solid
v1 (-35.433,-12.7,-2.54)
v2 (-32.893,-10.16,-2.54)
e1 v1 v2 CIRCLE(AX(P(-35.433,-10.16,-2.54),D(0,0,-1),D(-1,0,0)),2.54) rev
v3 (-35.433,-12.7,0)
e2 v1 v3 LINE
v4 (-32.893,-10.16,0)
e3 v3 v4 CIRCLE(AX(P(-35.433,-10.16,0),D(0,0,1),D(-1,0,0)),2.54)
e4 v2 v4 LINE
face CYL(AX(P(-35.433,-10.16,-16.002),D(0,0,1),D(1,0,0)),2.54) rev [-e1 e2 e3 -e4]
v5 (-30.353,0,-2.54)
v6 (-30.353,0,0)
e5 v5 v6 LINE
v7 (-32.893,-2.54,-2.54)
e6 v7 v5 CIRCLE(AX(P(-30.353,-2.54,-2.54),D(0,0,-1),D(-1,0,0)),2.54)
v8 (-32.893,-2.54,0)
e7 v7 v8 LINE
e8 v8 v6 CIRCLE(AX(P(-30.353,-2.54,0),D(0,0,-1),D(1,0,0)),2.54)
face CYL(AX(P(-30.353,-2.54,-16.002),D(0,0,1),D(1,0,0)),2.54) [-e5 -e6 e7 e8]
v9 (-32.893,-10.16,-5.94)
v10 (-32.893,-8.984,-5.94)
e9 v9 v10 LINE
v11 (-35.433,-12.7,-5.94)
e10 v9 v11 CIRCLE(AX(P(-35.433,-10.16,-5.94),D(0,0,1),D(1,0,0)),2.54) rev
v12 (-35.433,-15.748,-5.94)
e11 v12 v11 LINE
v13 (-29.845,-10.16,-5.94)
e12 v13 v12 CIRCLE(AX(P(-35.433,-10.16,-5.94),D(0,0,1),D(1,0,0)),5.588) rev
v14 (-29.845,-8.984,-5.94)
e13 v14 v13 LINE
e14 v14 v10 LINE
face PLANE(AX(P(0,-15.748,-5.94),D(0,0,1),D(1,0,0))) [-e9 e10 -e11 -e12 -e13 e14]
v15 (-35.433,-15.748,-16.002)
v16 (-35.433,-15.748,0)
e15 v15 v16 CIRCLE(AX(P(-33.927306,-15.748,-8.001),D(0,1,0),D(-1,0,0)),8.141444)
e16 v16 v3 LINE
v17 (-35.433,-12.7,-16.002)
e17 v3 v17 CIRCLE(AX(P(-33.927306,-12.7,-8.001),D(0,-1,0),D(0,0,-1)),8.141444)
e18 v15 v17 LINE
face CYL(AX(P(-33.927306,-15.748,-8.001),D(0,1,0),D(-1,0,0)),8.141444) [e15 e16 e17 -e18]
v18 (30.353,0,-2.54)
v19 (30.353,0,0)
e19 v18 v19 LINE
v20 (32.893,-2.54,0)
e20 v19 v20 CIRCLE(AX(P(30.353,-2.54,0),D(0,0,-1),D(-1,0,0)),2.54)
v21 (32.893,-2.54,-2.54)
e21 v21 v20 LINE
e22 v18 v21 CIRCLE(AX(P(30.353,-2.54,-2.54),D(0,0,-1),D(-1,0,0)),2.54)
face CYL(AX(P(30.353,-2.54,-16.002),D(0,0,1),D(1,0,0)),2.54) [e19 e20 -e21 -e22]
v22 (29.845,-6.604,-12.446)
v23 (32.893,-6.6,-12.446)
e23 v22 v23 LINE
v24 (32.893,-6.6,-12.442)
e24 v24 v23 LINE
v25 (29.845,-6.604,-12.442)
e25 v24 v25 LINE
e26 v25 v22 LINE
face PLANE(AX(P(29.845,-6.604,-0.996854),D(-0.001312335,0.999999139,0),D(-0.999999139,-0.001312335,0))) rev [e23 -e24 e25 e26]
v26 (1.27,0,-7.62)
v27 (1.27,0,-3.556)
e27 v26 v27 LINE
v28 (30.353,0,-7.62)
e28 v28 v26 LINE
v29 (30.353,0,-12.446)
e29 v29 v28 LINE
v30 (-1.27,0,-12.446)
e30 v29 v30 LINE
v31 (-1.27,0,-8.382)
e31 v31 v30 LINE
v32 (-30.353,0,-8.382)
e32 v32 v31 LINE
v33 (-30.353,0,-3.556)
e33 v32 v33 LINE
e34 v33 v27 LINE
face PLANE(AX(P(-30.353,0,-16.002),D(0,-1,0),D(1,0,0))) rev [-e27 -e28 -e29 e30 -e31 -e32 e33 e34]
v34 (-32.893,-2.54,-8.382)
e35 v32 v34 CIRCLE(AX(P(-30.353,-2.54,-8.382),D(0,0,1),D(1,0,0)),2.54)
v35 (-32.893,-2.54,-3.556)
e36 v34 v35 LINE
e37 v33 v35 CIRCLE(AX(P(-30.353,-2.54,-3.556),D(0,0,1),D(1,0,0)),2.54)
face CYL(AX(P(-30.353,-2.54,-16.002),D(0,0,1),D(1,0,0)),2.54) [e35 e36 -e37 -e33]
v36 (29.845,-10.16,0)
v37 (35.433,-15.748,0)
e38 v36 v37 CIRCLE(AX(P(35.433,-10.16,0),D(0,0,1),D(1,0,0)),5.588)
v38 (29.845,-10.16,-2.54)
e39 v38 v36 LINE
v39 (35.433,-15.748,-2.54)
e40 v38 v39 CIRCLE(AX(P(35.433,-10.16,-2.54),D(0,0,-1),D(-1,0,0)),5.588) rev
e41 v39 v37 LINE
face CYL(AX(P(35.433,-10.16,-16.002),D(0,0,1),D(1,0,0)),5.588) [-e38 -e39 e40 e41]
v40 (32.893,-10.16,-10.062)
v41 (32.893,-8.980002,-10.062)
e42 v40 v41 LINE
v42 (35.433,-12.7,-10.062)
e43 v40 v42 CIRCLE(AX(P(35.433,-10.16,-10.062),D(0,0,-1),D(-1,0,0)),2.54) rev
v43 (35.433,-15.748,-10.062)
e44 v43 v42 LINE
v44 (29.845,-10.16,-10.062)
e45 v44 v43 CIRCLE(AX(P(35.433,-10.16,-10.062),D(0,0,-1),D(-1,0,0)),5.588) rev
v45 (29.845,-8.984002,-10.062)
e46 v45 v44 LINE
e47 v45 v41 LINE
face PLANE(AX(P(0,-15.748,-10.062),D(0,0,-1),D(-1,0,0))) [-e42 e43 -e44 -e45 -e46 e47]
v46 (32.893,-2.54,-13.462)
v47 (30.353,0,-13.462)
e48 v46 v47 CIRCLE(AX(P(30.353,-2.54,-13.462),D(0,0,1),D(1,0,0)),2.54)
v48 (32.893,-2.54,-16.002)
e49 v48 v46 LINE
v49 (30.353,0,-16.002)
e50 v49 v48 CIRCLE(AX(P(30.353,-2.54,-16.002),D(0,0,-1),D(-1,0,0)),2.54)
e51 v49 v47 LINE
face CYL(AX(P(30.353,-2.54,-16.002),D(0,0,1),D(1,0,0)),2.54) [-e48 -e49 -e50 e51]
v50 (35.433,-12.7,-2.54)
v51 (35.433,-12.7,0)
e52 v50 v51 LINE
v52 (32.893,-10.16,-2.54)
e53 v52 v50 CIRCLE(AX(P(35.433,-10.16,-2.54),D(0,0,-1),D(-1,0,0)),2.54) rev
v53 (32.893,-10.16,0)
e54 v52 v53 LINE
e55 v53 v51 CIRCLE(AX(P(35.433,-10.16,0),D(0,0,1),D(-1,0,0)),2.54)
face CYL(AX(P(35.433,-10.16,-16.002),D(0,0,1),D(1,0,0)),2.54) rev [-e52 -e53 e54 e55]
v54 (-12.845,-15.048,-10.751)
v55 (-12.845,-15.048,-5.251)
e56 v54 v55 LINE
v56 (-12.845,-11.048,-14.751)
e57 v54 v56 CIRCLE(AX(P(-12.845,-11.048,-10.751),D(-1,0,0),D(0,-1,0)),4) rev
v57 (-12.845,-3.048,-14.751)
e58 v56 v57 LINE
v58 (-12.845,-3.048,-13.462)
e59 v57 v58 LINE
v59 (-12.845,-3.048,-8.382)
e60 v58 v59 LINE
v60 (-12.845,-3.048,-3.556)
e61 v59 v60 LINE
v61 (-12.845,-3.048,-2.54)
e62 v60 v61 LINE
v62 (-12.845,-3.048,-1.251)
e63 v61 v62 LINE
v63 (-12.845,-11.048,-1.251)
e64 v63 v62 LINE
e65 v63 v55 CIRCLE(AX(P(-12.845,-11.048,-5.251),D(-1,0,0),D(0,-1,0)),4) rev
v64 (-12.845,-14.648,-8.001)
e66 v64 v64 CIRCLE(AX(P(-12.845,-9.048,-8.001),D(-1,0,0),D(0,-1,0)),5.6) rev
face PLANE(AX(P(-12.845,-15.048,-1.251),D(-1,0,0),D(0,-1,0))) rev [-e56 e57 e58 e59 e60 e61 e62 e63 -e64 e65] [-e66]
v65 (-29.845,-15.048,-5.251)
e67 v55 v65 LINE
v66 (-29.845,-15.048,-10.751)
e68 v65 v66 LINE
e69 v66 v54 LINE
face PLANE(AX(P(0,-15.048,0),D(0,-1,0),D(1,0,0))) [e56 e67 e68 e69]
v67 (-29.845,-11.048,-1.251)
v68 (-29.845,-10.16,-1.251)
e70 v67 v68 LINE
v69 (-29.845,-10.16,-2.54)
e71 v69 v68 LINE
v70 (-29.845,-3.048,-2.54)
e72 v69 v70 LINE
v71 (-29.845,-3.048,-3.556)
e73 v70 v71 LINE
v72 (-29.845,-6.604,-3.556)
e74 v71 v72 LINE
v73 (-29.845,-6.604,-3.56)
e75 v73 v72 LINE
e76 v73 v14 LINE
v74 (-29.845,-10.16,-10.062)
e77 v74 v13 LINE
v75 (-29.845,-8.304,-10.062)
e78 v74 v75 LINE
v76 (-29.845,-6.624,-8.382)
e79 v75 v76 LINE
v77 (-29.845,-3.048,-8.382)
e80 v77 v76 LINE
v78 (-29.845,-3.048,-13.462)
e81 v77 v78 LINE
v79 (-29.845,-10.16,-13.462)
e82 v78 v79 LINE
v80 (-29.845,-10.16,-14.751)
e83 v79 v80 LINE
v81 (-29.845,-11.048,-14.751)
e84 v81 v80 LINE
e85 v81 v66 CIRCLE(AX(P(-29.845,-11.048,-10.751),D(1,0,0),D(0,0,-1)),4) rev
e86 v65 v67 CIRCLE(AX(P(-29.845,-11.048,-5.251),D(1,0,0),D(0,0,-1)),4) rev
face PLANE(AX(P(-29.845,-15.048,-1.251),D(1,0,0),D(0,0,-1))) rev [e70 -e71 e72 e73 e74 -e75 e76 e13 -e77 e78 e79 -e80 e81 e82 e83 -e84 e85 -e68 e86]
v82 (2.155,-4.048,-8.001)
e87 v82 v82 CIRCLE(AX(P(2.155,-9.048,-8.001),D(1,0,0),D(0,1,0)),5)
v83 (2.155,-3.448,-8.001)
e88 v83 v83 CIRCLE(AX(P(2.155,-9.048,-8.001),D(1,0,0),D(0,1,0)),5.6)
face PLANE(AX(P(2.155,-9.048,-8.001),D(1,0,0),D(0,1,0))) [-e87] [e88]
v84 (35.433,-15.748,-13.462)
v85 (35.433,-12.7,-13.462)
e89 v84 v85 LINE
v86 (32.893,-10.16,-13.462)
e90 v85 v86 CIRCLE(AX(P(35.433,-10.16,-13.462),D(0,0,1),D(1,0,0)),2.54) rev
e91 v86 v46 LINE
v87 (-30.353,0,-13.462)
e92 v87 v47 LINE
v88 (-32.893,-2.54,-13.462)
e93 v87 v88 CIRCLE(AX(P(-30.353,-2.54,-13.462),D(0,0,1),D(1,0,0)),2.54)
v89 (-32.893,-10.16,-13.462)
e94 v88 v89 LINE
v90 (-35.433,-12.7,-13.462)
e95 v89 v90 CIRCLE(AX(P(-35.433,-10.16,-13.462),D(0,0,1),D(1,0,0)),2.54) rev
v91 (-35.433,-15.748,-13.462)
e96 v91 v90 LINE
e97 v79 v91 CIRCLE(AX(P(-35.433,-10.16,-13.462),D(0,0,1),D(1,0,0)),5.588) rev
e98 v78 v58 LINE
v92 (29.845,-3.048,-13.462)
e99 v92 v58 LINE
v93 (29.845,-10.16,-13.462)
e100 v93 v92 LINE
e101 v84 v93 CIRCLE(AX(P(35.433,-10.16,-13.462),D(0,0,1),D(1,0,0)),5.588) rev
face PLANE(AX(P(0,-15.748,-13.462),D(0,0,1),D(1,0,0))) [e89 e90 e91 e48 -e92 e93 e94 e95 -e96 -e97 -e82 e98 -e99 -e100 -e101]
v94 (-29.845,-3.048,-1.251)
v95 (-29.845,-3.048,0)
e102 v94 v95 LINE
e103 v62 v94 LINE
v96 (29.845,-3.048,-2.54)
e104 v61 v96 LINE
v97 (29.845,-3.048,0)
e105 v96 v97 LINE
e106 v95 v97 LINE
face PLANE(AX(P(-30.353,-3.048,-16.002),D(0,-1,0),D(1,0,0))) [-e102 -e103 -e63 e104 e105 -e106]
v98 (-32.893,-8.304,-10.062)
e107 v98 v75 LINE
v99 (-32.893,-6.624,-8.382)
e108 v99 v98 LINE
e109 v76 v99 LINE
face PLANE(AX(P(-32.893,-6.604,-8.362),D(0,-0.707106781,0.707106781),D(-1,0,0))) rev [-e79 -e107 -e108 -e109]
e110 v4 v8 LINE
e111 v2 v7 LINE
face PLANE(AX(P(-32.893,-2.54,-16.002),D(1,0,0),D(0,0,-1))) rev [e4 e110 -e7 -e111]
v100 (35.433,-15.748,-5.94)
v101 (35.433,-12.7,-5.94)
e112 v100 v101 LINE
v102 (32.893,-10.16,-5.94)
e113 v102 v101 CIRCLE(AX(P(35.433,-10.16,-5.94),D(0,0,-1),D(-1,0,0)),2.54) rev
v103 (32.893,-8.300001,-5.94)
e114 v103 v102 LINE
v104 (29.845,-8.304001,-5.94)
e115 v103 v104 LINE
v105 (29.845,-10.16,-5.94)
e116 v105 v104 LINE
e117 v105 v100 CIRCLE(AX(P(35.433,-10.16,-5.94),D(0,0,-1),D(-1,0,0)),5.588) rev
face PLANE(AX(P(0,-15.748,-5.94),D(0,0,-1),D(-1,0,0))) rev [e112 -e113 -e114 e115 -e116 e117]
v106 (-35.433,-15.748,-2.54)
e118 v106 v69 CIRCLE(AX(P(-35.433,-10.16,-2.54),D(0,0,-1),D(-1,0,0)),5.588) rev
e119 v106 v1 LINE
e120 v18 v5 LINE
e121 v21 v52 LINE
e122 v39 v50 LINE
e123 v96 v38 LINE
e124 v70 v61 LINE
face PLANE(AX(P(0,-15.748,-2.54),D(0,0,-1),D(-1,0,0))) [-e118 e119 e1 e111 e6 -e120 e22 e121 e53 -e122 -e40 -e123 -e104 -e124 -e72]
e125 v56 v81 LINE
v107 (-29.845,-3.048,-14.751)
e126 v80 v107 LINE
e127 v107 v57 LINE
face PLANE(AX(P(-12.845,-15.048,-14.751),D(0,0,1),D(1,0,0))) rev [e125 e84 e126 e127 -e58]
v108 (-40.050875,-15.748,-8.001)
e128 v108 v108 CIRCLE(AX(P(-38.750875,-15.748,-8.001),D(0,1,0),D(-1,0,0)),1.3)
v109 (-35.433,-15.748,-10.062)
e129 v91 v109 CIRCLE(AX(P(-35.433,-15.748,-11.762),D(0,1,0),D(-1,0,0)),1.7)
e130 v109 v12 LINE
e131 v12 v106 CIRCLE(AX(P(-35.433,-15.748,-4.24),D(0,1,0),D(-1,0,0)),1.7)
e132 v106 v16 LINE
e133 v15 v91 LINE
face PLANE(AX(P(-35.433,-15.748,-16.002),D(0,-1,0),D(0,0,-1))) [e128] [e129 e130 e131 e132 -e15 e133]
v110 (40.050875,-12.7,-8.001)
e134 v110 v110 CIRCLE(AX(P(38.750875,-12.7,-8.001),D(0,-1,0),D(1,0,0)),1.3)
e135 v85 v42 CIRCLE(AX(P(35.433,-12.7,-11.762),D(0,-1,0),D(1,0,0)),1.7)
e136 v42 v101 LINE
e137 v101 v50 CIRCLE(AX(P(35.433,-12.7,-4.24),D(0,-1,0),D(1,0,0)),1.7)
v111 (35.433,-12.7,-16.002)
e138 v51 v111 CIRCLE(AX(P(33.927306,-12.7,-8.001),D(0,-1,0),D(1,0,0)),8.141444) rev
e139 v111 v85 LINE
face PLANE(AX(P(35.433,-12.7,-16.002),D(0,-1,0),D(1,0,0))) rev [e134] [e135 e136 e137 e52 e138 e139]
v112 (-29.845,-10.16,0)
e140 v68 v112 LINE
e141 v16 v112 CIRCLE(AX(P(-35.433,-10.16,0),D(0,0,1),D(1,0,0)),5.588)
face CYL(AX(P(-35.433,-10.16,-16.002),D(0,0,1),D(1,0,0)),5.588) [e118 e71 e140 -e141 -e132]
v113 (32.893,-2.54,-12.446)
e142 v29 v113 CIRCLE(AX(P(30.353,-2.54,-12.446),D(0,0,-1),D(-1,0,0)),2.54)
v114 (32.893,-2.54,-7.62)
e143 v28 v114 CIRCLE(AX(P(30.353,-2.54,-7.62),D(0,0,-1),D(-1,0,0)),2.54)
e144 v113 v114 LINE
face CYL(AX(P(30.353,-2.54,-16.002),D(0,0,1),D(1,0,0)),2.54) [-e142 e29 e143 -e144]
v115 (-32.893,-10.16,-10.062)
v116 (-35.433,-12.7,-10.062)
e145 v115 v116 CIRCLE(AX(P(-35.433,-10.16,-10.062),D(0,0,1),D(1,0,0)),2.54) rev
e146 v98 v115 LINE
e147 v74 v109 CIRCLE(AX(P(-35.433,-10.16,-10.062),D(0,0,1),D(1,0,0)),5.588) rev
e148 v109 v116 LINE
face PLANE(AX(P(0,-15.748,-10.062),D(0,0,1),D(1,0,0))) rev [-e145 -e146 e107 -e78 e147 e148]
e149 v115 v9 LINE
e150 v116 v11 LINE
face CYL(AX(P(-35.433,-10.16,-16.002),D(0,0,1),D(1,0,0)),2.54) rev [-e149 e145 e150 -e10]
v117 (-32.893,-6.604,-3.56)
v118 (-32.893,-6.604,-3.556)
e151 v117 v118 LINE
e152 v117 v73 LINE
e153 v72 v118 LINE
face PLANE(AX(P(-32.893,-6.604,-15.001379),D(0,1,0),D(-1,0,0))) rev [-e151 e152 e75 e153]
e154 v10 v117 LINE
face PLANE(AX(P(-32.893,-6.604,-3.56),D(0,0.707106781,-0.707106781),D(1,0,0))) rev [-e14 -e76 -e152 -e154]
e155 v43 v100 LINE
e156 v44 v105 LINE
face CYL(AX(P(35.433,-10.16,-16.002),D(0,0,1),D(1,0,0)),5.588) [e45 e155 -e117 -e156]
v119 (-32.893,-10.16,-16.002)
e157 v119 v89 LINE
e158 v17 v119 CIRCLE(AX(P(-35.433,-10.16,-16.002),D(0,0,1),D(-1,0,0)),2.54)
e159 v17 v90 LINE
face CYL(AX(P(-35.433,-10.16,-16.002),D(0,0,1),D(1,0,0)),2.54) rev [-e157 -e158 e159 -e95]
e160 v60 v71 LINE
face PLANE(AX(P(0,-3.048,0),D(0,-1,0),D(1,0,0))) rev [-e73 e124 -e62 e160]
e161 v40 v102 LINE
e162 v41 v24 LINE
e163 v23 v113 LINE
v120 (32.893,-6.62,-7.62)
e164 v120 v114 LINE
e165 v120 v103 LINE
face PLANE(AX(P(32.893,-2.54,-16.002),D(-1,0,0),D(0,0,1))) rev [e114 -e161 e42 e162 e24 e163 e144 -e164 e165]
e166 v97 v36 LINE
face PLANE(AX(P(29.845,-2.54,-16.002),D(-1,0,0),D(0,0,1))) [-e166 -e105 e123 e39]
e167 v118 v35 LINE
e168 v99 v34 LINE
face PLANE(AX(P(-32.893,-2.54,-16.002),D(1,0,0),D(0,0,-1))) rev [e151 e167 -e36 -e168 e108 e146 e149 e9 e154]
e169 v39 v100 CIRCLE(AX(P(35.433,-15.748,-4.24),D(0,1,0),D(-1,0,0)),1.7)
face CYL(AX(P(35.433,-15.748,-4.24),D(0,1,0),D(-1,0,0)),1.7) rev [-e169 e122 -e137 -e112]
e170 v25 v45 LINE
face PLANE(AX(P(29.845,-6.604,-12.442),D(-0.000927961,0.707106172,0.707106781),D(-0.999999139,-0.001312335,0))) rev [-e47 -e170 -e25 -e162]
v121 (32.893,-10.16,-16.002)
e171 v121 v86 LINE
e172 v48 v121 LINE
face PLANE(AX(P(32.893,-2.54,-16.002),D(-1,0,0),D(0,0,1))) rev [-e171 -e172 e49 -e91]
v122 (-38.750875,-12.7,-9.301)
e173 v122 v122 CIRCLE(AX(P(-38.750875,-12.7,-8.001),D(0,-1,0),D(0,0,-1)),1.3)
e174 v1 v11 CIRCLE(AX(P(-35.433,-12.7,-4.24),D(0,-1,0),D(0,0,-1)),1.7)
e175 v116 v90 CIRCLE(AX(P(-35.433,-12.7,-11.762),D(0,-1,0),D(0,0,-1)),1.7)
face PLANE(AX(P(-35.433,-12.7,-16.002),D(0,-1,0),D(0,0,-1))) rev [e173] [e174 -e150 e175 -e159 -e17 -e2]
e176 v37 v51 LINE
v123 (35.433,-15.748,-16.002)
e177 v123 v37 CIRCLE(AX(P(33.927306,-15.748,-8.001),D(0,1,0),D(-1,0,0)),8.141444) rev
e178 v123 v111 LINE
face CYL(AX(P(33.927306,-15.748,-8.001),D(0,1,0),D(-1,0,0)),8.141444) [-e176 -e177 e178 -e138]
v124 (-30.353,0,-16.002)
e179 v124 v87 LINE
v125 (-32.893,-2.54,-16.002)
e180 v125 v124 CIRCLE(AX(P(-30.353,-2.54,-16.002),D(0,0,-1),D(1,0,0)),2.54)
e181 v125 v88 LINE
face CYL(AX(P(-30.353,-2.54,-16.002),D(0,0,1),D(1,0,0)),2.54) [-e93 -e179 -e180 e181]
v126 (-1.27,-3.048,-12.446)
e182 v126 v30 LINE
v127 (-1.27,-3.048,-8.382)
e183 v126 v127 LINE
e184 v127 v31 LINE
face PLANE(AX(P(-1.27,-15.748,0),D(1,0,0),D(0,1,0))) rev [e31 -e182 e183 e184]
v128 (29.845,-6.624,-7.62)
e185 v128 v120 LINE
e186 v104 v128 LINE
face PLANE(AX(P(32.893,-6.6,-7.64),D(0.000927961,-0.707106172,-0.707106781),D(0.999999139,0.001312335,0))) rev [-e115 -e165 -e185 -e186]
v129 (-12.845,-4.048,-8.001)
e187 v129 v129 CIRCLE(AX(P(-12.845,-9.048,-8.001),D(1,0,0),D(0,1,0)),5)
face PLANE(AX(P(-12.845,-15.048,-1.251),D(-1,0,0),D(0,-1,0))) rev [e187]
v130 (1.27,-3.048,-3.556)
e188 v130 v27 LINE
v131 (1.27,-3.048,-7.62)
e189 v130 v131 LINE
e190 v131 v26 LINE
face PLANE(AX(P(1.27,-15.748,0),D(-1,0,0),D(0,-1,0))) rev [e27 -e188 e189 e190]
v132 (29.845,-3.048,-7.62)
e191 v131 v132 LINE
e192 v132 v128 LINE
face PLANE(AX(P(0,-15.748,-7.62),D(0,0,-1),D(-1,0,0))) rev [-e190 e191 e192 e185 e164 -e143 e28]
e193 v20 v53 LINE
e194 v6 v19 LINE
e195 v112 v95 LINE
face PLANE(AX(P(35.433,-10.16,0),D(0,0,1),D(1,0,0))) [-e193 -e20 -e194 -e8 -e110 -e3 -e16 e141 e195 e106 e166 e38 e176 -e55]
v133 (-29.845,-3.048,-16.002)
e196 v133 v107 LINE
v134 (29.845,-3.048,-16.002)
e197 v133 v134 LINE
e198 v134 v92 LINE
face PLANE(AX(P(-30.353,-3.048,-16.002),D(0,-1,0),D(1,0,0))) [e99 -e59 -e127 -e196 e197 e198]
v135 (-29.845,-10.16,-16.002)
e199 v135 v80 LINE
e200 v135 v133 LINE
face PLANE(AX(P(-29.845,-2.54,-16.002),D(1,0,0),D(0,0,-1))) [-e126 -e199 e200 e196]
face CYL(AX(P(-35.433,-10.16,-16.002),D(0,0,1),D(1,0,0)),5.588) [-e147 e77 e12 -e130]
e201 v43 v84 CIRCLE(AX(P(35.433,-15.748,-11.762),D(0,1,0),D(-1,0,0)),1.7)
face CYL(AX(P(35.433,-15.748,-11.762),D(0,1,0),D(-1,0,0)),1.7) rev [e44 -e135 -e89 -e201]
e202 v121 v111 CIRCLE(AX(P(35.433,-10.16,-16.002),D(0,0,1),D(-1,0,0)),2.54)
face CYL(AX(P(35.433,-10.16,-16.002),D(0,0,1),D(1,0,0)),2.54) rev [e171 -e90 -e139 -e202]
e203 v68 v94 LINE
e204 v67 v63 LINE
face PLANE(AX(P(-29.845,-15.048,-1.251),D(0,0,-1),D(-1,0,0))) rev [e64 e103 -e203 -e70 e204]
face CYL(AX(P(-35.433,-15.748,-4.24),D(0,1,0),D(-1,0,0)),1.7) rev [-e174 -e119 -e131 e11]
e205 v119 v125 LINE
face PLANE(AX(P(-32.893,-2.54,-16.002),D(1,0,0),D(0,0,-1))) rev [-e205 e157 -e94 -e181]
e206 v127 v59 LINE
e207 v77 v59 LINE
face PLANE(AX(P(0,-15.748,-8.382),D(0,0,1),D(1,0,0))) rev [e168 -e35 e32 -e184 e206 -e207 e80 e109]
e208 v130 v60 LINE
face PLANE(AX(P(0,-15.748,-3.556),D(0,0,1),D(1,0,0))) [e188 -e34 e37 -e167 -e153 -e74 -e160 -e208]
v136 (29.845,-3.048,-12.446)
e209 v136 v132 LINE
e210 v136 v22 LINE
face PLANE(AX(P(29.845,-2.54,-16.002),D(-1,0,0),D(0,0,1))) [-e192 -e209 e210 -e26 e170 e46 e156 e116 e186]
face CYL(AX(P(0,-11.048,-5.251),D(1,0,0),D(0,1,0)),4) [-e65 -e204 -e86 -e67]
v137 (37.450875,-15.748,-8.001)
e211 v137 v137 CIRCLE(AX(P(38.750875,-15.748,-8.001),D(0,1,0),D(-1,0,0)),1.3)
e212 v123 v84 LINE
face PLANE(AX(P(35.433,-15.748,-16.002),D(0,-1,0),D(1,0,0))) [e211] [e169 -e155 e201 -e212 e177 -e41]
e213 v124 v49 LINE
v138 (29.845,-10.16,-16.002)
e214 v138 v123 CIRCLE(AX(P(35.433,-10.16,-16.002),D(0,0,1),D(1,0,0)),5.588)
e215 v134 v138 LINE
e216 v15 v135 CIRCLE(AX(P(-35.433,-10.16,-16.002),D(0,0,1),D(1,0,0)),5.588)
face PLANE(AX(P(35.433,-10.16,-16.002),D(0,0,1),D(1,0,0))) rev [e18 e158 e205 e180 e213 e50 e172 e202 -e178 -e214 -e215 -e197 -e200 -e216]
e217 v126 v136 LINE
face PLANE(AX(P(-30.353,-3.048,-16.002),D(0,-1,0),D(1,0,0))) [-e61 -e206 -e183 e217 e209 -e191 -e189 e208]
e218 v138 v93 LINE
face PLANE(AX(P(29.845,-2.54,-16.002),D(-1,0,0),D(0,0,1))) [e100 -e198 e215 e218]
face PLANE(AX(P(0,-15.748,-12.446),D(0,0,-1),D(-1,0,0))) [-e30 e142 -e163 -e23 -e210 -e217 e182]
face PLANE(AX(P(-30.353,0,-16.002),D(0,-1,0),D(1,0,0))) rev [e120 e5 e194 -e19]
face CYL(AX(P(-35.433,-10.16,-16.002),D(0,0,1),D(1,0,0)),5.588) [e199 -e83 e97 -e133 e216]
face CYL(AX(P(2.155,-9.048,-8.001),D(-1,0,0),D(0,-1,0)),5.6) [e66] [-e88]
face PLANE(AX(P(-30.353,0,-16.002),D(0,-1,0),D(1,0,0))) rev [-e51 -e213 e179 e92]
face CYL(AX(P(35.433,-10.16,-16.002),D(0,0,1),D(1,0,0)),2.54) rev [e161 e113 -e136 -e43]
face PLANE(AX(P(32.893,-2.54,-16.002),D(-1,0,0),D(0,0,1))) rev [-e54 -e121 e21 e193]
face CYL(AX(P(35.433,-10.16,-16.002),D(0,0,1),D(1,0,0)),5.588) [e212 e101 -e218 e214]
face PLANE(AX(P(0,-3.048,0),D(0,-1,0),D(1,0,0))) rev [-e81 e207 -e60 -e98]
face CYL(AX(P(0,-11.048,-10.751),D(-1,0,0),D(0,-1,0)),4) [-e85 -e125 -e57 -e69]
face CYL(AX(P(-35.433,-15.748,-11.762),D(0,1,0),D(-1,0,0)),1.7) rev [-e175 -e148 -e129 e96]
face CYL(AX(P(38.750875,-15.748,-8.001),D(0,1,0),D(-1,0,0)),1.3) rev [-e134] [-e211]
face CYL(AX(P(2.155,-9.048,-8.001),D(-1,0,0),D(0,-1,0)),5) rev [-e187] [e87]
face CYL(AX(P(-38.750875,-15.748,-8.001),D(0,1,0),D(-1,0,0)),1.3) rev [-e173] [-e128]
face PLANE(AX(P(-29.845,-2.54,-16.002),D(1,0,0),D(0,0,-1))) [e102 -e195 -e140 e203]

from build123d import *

# Parameters (mm, degrees)
EXTRUDE_THIN1_DEPTH    = 16.002
CUT_EXTRUDE1_START     = -15.748
CUT_EXTRUDE1_OUTLINE_R = 1.3
CUT_EXTRUDE1_DEPTH     = 15.748
BOSS_EXTRUDE2_DEPTH    = 1.68
BOSS_EXTRUDE3_START    = 1.68
BOSS_EXTRUDE3_DEPTH    = 1.68
CUT_EXTRUDE2_START     = -2.384
CUT_EXTRUDE2_DEPTH     = 2.384
CUT_EXTRUDE3_DEPTH     = 2.384
CHAMFER1_SIZE          = 1.7
CHAMFER2_SIZE          = 2.38
SKETCH10_W             = 17
SKETCH10_H             = 13.5
BOSS_EXTRUDE4_DEPTH    = 12
SKETCH11_R             = 5.6
SKETCH11_R_2           = 5
BOSS_EXTRUDE5_DEPTH    = 15
FILLET1_R              = 4


# Read off the part's stored shape, not the designer's step: Cut-Extrude1
with BuildPart() as part:
    # Sketch1 → Extrude-Thin1 (new body)
    with BuildSketch(Plane.XY):
        with BuildLine():
            Line((-42.06875, -12.7), (-35.433, -12.7))
            ThreePointArc((-35.433, -12.7), (-33.636948776, -11.956051224), (-32.893, -10.16))
            Line((-32.893, -10.16), (-32.893, -2.54))
            ThreePointArc((-32.893, -2.54), (-32.149051224, -0.743948776), (-30.353, 0))
            Line((-30.353, 0), (30.353, 0))
            ThreePointArc((30.353, 0), (32.149051224, -0.743948776), (32.893, -2.54))
            Line((32.893, -2.54), (32.893, -10.16))
            ThreePointArc((32.893, -10.16), (33.636948776, -11.956051224), (35.433, -12.7))
            Line((35.433, -12.7), (42.06875, -12.7))
            Line((42.06875, -12.7), (42.06875, -15.748))
            Line((42.06875, -15.748), (35.433, -15.748))
            ThreePointArc((35.433, -15.748), (31.481687307, -14.111312693), (29.845, -10.16))
            Line((29.845, -10.16), (29.845, -3.048))
            Line((29.845, -3.048), (-29.845, -3.048))
            Line((-29.845, -3.048), (-29.845, -10.16))
            ThreePointArc((-29.845, -10.16), (-31.481687307, -14.111312693), (-35.433, -15.748))
            Line((-35.433, -15.748), (-42.06875, -15.748))
            Line((-42.06875, -15.748), (-42.06875, -12.7))
        make_face()
    extrude(amount=-EXTRUDE_THIN1_DEPTH)

    # Cut-Extrude1 outline → Cut-Extrude1 (cut)
    with BuildSketch(Plane(origin=(0, 0, 0), x_dir=(1, 0, 0), z_dir=(0, 1, 0)).offset(CUT_EXTRUDE1_START)):
        with BuildLine():
            Line((35.433, 13.462), (-35.433, 13.462))
            ThreePointArc((-35.433, 13.462), (-37.133, 11.762), (-35.433, 10.062))
            Line((-35.433, 10.062), (-32.893, 10.062))
            Line((-32.893, 10.062), (-32.893, 8.382))
            Line((-32.893, 8.382), (-1.27, 8.382))
            Line((-1.27, 8.382), (-1.27, 12.446))
            Line((-1.27, 12.446), (32.893, 12.446))
            Line((32.893, 12.446), (32.893, 10.062))
            Line((32.893, 10.062), (35.433, 10.062))
            ThreePointArc((35.433, 10.062), (37.133, 11.762), (35.433, 13.462))
        make_face()
        with BuildLine():
            Line((32.893, 5.94), (32.893, 7.62))
            Line((32.893, 7.62), (1.27, 7.62))
            Line((1.27, 7.62), (1.27, 3.556))
            Line((1.27, 3.556), (-32.893, 3.556))
            Line((-32.893, 3.556), (-32.893, 5.94))
            Line((-32.893, 5.94), (-35.433, 5.94))
            ThreePointArc((-35.433, 5.94), (-37.133, 4.24), (-35.433, 2.54))
            Line((-35.433, 2.54), (35.433, 2.54))
            ThreePointArc((35.433, 2.54), (37.133, 4.24), (35.433, 5.94))
            Line((35.433, 5.94), (32.893, 5.94))
        make_face()
        with BuildLine():
            Line((42.06875, 16.002), (35.433, 16.002))
            ThreePointArc((35.433, 16.002), (40.193949205, 13.198335352), (42.06875, 8.001))
            Line((42.06875, 8.001), (42.06875, 16.002))
        make_face()
        with BuildLine():
            Line((42.06875, 0), (42.06875, 8.001))
            ThreePointArc((42.06875, 8.001), (40.193949205, 2.803664648), (35.433, 0))
            Line((35.433, 0), (42.06875, 0))
        make_face()
        with BuildLine():
            ThreePointArc((-42.06875, 8.001), (-40.193949205, 13.198335352), (-35.433, 16.002))
            Line((-35.433, 16.002), (-42.06875, 16.002))
            Line((-42.06875, 16.002), (-42.06875, 8.001))
        make_face()
        with BuildLine():
            ThreePointArc((-35.433, 0), (-40.193949205, 2.803664648), (-42.06875, 8.001))
            Line((-42.06875, 8.001), (-42.06875, 0))
            Line((-42.06875, 0), (-35.433, 0))
        make_face()
        with Locations((38.750875, 8.001)):
            Circle(CUT_EXTRUDE1_OUTLINE_R)
        with Locations((-38.750875, 8.001)):
            Circle(CUT_EXTRUDE1_OUTLINE_R)
    extrude(amount=CUT_EXTRUDE1_DEPTH, mode=Mode.SUBTRACT)

    # Sketch6 → Boss-Extrude2 (add)
    with BuildSketch(Plane(origin=(0, 0, -8.382), x_dir=(-1, 0, 0), z_dir=(0, 0, -1))):
        with BuildLine():
            Line((32.893, -10.16), (32.893, -6.604))
            Line((32.893, -6.604), (29.845, -6.604))
            Line((29.845, -6.604), (29.845, -10.16))
            ThreePointArc((29.845, -10.16), (30.667537588, -13.078237824), (32.893, -15.137363157))
            Line((32.893, -15.137363157), (32.893, -10.16))
        make_face()
    extrude(amount=BOSS_EXTRUDE2_DEPTH)

    # Sketch7 → Boss-Extrude3 (add)
    with BuildSketch(Plane.XY.offset(-7.62).offset(BOSS_EXTRUDE3_START)):
        with BuildLine():
            Line((32.893, -10.16), (32.893, -6.6))
            Line((32.893, -6.6), (29.845, -6.604))
            Line((29.845, -6.604), (29.845, -10.16))
            ThreePointArc((29.845, -10.16), (30.667537588, -13.078237824), (32.893, -15.137363157))
            Line((32.893, -15.137363157), (32.893, -10.16))
        make_face()
    extrude(amount=-BOSS_EXTRUDE3_DEPTH)

    # Sketch8 → Cut-Extrude2 (cut)
    with BuildSketch(Plane(origin=(0, 0, -12.446), x_dir=(-1, 0, 0), z_dir=(0, 0, -1)).offset(CUT_EXTRUDE2_START)):
        with BuildLine():
            Line((-32.893, -15.137363157), (-32.893, -6.6))
            Line((-32.893, -6.6), (-29.845, -6.604))
            Line((-29.845, -6.604), (-29.845, -10.16))
            ThreePointArc((-29.845, -10.16), (-30.667537588, -13.078237824), (-32.893, -15.137363157))
        make_face()
    extrude(amount=CUT_EXTRUDE2_DEPTH, mode=Mode.SUBTRACT)

    # Sketch9 → Cut-Extrude3 (cut)
    with BuildSketch(Plane.XY.offset(-3.556)):
        with BuildLine():
            Line((-32.893, -15.137363157), (-32.893, -6.604))
            Line((-32.893, -6.604), (-29.845, -6.604))
            Line((-29.845, -6.604), (-29.845, -10.16))
            ThreePointArc((-29.845, -10.16), (-30.667537588, -13.078237824), (-32.893, -15.137363157))
        make_face()
    extrude(amount=-CUT_EXTRUDE3_DEPTH, mode=Mode.SUBTRACT)

    # Chamfer1
    # the kernel refuses this chamfer: 1.7 mm, written as the material it adds along each edge
    # the kernel refuses this chamfer: 1.7 mm, written as the material it takes off along each edge
    with BuildSketch(Plane(origin=(-37.26486108, -6.604, -10.062), x_dir=(0, -0.9996219169112968, -0.02749587661058687), z_dir=(1, 0, 0))) as chamfer1_2_piece_1_section:
        Polygon((CHAMFER1_SIZE * 0.999621916911, -CHAMFER1_SIZE * 0.0274958766106), (-CHAMFER1_SIZE * 0.0274958766106, -CHAMFER1_SIZE * 0.999621916911), (0, 0), align=None)
    chamfer1_2_piece_1 = extrude(amount=11.791722159, mode=Mode.PRIVATE)
    chamfer1_2_piece_1 = split(chamfer1_2_piece_1, bisect_by=Plane(origin=(-31.369, -7.170744186, -8.382), z_dir=(0, 0, -1)), keep=Keep.TOP, mode=Mode.PRIVATE)
    add(chamfer1_2_piece_1, mode=Mode.SUBTRACT)
    with BuildSketch(Plane(origin=(37.264857315, -6.594262654, -5.94), x_dir=(0.00131183865632537, -0.9996210561251475, 0.02749587661058631), z_dir=(-0.999999138888279, -0.0013123348279305267, 0))) as chamfer1_2_piece_2_section:
        Polygon((CHAMFER1_SIZE * 0.999621916911, -CHAMFER1_SIZE * 0.0274958766106), (-CHAMFER1_SIZE * 0.0274958766106, -CHAMFER1_SIZE * 0.999621916911), (0, 0), align=None)
    chamfer1_2_piece_2 = extrude(amount=11.791724784, mode=Mode.PRIVATE)
    chamfer1_2_piece_2 = split(chamfer1_2_piece_2, bisect_by=Plane(origin=(31.369, -7.168744674, -7.62), z_dir=(0, 0, 1)), keep=Keep.TOP, mode=Mode.PRIVATE)
    add(chamfer1_2_piece_2, mode=Mode.SUBTRACT)

    # Chamfer2
    chamfer2_edges = [part.edges().sort_by_distance(p)[0] for p in [
        (31.369, -6.602, -10.062),
        (-31.369, -6.604, -5.94),
    ]]
    chamfer(chamfer2_edges, length=CHAMFER2_SIZE)

    # Sketch10 → Boss-Extrude4 (add)
    with BuildSketch(Plane.XZ.offset(3.048)):
        with Locations((-21.345, -8.001)):
            Rectangle(SKETCH10_W, SKETCH10_H)
    extrude(amount=BOSS_EXTRUDE4_DEPTH)

    # Sketch11 → Boss-Extrude5 (add)
    with BuildSketch(Plane(origin=(-12.845, 0, 0), x_dir=(0, 0, -1), z_dir=(1, 0, 0))):
        with Locations(Location((8.001, -9.048, 0), (0, 0, 270))):
            Circle(SKETCH11_R)
        with Locations(Location((8.001, -9.048, 0), (0, 0, 90))):
            Circle(SKETCH11_R_2, mode=Mode.SUBTRACT)
    extrude(amount=BOSS_EXTRUDE5_DEPTH)

    # Fillet1
    fillet1_edges = [part.edges().sort_by_distance(p)[0] for p in [
        (-21.345, -15.048, -14.751),
        (-21.345, -15.048, -1.251),
    ]]
    fillet(fillet1_edges, radius=FILLET1_R)


solid = part.part
